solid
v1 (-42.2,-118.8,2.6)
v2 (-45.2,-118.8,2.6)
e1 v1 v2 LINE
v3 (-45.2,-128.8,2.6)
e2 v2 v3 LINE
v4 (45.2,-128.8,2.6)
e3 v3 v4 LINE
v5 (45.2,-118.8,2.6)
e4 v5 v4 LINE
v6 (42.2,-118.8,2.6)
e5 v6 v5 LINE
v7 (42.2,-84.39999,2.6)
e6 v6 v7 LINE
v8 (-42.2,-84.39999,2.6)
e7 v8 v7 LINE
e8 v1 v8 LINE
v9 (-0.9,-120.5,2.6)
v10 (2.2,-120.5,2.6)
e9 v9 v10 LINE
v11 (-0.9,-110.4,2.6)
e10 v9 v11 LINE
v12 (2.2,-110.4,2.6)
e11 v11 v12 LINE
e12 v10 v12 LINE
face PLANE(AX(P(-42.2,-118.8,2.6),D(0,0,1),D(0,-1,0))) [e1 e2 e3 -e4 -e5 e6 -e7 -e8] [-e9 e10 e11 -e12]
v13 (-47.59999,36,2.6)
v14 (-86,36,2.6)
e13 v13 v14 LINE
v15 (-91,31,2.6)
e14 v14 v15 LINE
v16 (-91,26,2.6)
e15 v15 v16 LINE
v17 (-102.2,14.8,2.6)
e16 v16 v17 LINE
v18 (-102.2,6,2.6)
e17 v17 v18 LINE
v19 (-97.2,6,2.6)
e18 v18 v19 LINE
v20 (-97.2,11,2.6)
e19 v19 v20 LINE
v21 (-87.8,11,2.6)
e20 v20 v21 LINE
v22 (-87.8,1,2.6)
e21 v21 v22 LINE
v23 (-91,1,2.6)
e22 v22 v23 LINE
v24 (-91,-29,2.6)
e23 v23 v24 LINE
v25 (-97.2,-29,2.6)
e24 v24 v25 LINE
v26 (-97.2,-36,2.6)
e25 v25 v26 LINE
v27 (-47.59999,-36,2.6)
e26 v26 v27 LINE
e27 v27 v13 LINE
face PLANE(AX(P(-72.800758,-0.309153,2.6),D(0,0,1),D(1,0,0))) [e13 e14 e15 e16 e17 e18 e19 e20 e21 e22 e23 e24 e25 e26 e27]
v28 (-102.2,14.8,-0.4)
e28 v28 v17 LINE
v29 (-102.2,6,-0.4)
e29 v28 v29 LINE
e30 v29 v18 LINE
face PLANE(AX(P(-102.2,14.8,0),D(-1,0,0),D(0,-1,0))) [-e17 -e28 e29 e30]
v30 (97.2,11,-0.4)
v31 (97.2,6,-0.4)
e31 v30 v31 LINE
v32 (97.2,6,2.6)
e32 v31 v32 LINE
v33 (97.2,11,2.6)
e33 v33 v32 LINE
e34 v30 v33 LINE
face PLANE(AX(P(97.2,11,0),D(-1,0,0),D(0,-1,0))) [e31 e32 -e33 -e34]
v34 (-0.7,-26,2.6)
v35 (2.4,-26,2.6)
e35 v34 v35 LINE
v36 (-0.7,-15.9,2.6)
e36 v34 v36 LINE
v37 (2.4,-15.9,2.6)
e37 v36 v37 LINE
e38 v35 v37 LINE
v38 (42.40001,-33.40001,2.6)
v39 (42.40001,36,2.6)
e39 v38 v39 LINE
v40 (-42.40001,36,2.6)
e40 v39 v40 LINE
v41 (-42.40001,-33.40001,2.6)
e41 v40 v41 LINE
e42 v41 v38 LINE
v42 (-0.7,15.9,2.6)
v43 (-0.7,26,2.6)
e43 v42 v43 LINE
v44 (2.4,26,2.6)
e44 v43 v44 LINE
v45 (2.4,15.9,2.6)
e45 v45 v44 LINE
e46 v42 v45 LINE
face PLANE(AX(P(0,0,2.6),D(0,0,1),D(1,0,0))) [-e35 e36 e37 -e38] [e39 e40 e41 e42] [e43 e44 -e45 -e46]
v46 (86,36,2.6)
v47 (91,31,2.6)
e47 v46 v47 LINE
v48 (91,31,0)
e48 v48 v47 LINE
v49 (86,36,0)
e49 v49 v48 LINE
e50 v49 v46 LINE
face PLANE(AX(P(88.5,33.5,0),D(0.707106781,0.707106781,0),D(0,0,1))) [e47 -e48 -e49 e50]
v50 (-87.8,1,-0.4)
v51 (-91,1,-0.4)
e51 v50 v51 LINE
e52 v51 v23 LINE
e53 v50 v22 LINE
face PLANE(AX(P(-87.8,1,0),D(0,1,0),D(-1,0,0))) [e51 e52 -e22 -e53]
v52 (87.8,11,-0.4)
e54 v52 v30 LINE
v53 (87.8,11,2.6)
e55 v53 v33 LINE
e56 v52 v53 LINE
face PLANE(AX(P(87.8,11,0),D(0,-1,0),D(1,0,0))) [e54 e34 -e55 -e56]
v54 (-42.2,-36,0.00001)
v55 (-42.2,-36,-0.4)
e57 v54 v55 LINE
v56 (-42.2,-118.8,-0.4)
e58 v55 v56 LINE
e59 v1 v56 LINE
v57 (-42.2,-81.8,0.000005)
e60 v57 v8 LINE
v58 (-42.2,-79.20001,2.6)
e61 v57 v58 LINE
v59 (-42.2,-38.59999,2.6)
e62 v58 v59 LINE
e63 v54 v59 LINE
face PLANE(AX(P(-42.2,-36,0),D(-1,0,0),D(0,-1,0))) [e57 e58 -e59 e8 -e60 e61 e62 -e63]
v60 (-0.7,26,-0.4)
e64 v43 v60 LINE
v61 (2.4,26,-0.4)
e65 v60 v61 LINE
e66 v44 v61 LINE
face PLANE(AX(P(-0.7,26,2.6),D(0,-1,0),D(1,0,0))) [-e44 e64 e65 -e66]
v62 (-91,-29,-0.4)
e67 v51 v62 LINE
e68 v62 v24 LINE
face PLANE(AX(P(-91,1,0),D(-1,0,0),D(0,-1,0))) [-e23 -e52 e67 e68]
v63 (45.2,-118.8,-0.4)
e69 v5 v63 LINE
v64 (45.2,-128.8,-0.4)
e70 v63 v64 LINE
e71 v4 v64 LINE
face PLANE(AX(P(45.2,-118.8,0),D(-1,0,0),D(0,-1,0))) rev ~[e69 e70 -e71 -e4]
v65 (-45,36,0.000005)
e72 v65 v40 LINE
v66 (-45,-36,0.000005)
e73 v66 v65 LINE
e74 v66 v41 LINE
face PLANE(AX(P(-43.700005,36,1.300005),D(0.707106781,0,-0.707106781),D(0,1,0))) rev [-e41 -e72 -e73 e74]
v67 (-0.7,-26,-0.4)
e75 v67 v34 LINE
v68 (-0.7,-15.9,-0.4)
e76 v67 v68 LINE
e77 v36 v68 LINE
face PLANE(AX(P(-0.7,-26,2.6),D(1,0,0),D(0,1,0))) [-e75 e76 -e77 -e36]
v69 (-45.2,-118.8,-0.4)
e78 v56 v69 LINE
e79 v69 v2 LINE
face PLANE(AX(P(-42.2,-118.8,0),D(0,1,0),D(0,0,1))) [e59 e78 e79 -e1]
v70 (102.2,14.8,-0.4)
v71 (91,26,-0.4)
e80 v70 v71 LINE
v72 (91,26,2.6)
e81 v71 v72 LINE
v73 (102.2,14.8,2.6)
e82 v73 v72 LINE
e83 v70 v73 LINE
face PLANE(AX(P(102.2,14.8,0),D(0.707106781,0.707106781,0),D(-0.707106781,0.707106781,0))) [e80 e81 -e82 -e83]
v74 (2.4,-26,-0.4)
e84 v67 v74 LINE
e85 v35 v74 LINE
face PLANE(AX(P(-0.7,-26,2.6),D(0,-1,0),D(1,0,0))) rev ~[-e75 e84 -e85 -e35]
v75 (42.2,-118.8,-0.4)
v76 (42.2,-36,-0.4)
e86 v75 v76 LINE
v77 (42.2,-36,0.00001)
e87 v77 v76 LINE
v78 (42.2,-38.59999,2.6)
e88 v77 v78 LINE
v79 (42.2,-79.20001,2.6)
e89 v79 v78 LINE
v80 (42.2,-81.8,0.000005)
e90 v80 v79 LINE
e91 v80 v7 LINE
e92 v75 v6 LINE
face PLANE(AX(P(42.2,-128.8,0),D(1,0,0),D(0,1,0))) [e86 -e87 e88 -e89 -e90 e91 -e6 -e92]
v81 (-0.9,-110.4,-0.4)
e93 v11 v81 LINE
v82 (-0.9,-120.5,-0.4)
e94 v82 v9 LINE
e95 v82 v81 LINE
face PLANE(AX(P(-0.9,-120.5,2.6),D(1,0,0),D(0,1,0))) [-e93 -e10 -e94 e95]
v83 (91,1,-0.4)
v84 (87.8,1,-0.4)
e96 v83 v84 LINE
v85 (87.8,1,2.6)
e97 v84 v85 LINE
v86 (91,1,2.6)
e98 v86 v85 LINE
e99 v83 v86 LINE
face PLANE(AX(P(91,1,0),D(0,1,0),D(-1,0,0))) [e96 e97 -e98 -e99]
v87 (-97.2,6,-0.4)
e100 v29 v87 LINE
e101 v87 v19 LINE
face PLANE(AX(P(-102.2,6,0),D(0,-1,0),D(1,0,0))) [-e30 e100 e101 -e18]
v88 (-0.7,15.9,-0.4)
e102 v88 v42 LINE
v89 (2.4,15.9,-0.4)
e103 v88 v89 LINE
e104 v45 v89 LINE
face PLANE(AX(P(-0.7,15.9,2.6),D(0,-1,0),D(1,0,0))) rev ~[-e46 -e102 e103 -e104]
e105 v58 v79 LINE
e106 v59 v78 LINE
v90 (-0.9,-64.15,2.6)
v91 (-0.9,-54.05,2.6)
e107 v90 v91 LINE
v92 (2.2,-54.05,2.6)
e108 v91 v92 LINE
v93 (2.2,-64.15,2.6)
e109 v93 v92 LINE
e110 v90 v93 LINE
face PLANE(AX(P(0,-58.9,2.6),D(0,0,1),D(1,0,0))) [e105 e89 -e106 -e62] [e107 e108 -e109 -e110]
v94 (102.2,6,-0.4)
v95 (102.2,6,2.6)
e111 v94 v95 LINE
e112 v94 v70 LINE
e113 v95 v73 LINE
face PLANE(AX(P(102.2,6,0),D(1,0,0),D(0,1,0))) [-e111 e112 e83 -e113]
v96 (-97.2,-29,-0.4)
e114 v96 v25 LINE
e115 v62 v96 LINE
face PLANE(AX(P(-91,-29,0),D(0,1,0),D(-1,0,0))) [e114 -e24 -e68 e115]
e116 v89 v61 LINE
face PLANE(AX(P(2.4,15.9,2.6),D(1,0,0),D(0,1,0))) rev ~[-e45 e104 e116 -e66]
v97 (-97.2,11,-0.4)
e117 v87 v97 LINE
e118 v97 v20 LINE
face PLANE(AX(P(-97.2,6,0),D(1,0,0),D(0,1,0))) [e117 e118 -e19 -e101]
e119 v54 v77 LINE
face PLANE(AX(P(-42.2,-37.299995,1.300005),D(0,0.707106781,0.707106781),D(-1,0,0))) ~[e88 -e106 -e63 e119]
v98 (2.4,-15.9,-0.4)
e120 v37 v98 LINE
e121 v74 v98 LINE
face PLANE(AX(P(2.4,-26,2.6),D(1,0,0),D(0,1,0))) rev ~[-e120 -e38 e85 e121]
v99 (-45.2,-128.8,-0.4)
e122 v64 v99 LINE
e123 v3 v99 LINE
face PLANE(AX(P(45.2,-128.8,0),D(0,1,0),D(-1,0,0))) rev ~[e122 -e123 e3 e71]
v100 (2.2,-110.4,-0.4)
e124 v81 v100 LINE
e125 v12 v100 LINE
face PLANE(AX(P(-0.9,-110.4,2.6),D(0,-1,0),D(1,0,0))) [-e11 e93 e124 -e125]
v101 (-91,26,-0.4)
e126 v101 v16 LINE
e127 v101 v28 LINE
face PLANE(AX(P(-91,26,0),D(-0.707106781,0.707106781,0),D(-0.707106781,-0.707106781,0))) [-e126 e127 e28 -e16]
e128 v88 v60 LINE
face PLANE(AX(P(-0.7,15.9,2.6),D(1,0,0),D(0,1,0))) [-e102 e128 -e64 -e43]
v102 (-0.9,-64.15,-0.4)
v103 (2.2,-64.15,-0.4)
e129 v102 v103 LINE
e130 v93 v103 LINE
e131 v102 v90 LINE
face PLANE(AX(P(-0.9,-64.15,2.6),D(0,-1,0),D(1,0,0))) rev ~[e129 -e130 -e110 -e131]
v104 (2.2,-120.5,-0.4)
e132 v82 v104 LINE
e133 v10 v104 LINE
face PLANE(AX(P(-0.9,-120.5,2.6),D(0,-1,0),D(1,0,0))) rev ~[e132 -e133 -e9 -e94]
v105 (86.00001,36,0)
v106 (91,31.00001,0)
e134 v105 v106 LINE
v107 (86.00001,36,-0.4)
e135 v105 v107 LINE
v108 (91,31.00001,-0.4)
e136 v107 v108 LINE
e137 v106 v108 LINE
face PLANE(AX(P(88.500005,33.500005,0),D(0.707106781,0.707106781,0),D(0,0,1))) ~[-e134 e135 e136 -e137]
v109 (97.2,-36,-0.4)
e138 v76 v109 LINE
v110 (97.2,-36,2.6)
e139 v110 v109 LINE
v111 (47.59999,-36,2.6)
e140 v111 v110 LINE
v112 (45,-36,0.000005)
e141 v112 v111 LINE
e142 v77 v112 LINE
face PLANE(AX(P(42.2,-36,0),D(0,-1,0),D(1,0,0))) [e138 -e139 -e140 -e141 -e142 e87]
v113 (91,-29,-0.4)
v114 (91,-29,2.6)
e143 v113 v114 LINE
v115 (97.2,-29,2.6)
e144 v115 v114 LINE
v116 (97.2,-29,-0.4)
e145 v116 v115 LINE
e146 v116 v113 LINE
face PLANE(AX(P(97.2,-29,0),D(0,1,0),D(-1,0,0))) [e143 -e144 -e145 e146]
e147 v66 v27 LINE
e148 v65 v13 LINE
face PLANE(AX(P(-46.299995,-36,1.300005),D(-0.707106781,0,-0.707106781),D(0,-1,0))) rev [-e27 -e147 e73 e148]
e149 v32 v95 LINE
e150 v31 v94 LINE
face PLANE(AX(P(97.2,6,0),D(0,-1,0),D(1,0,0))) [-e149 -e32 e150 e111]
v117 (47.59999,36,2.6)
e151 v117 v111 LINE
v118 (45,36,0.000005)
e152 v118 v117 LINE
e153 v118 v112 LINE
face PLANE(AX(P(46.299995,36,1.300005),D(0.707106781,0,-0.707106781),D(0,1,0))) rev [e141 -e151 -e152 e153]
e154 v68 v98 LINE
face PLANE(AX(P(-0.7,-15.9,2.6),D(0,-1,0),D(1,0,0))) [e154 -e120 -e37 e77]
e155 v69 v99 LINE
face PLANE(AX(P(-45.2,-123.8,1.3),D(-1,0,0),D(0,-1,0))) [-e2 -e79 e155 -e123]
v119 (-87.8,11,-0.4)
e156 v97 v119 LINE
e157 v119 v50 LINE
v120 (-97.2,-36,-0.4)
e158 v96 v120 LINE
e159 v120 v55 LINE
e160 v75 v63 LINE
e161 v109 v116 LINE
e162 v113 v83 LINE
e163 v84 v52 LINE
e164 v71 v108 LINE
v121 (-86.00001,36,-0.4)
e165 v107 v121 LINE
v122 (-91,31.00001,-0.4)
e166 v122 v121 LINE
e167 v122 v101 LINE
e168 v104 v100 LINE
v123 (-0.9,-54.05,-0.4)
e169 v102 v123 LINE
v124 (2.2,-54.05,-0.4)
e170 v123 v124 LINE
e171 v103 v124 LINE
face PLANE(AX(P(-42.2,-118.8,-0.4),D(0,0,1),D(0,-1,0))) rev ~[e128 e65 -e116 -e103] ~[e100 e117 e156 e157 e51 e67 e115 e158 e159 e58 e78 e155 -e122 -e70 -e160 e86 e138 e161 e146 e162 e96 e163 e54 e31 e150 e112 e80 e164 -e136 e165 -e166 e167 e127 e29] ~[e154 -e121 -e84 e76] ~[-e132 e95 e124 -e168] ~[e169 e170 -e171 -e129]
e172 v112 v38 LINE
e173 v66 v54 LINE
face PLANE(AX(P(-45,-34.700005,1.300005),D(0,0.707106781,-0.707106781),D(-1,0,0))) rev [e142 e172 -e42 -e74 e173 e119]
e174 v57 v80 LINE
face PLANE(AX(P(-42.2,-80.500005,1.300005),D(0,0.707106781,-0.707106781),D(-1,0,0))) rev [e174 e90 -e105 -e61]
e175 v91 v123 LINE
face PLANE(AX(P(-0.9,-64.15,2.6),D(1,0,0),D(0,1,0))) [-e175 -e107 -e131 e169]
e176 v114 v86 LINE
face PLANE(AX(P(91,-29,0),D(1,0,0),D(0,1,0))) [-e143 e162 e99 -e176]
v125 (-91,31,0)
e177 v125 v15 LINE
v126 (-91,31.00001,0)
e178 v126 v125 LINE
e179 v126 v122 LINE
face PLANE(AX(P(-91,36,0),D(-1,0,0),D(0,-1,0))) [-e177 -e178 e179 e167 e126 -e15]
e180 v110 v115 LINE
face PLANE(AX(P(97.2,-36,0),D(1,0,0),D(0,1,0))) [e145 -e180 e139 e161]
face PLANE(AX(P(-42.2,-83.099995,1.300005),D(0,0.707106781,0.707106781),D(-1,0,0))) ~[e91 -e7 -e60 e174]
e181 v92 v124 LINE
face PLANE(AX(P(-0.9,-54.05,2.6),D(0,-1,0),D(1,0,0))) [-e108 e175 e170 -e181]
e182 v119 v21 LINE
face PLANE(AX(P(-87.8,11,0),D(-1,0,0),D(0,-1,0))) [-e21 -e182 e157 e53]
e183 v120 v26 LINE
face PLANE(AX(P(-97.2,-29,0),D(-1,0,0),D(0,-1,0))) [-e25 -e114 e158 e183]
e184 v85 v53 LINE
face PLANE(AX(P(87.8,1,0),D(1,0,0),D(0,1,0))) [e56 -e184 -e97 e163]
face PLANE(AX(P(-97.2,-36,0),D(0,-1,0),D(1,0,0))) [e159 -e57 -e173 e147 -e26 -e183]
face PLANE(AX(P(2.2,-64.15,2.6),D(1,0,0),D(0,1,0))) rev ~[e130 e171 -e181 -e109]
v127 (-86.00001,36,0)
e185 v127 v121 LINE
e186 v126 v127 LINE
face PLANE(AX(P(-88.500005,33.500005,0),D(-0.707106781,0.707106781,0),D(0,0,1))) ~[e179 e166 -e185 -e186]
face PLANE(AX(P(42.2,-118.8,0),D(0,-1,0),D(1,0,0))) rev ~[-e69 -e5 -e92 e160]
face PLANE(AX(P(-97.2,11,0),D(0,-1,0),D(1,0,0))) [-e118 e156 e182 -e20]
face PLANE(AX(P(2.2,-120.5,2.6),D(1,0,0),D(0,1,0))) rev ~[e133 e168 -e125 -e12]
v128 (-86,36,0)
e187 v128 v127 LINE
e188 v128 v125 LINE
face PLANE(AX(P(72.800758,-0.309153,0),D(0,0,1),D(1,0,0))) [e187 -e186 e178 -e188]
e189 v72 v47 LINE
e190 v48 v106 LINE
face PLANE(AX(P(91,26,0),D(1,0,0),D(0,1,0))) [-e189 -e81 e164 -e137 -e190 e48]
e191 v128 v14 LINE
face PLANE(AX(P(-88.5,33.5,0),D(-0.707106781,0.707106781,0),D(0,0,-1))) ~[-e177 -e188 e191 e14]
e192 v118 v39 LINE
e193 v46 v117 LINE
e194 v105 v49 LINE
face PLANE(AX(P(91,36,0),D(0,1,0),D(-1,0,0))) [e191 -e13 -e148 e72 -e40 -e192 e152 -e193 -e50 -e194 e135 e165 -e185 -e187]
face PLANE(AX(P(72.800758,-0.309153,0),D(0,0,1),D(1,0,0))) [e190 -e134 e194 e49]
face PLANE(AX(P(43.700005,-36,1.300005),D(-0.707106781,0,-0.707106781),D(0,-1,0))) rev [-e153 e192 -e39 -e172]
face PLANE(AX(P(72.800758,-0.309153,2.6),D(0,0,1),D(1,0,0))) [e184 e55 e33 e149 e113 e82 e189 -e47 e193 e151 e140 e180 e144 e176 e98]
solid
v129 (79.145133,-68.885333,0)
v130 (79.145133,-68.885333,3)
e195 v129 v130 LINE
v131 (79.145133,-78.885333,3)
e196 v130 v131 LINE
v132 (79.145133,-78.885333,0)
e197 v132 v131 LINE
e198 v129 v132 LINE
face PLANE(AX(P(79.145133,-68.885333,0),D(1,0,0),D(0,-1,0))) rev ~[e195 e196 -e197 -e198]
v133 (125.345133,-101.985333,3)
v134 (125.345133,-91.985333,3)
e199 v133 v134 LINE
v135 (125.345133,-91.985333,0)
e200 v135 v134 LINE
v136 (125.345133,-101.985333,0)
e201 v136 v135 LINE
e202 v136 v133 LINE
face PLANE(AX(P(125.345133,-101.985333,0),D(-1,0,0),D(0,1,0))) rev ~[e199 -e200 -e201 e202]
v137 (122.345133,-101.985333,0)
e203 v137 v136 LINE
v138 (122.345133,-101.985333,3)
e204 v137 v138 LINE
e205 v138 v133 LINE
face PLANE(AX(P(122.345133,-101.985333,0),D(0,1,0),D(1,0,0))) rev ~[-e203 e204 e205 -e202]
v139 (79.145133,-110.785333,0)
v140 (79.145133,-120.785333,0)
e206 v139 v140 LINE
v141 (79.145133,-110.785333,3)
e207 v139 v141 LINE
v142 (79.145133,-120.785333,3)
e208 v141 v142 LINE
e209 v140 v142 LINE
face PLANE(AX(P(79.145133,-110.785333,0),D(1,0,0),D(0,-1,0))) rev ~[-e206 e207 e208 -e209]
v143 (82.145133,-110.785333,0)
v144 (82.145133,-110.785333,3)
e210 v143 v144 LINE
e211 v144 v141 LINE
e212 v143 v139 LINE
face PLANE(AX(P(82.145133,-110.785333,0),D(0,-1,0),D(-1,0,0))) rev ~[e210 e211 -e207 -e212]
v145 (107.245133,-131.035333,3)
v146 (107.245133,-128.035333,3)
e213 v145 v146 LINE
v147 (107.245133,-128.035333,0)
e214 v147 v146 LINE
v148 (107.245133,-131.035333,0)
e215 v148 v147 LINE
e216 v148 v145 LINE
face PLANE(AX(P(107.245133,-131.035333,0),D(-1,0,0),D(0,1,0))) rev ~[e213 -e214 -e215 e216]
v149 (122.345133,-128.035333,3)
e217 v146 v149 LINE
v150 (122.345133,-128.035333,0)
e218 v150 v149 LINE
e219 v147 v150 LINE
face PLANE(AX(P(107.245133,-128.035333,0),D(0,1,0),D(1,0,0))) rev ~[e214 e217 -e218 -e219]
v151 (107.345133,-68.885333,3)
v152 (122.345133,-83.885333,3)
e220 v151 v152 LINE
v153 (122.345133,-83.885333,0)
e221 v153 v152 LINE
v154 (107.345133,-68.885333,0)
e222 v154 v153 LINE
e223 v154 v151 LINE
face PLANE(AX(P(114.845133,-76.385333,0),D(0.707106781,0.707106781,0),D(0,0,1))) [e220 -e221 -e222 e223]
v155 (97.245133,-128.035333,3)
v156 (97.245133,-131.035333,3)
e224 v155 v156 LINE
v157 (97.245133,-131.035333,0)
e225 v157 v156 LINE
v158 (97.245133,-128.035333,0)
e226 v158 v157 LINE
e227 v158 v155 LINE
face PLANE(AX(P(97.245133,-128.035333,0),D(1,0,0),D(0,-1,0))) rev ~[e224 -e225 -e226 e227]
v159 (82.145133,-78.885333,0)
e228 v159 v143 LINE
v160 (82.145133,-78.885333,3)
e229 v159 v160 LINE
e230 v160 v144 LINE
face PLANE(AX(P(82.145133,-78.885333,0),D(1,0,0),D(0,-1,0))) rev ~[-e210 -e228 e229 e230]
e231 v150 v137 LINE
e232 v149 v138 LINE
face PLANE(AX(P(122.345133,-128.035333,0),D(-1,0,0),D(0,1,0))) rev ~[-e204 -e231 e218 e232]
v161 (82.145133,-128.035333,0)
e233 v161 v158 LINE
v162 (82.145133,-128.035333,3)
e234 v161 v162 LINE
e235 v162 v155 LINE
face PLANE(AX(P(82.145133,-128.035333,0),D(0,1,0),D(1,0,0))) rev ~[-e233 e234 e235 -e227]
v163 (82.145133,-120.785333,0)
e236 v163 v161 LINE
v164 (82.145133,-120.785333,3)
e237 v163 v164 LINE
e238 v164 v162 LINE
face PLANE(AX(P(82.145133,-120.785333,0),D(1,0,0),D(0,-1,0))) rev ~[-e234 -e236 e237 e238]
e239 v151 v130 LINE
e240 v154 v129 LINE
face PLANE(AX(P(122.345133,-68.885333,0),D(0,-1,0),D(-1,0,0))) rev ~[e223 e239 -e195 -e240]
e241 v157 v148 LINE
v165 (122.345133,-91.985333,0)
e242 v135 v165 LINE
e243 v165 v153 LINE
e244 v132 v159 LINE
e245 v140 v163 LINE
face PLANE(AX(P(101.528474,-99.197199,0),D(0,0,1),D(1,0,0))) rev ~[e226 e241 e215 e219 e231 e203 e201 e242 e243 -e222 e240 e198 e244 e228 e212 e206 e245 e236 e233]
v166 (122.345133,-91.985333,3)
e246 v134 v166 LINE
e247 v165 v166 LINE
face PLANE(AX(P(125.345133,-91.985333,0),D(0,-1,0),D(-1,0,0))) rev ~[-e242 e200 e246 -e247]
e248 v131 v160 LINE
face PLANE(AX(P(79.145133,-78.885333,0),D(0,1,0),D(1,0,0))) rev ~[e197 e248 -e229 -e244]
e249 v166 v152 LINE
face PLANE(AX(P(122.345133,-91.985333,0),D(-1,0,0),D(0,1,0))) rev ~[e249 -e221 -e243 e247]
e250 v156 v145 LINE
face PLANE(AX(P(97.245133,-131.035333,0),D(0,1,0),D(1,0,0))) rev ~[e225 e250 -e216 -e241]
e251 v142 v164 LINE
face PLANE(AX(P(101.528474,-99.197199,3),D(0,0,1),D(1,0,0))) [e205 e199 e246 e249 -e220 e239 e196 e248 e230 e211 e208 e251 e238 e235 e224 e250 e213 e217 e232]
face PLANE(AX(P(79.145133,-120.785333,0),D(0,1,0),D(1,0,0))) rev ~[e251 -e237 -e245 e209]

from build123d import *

# Parameters (mm, degrees)
F1_DEPTH   = 2.6
F2_SIZE    = 2.59999
F2_2_SIZE  = 2.59999
F3_DEPTH   = 2.6
F4_SIZE    = 2.59999
F5_W       = 3.1
F5_H       = 10.1
F6_DEPTH   = 4
F0_W       = 84.4
F0_H       = 45.8
F7_DEPTH   = 2.6
F8_SIZE    = 2.59999
F0_H_2     = 47
F9_DEPTH   = 2.6
F10_SIZE   = 2.59999
F11_W      = 10
F11_H      = 2.6
F12_DEPTH  = 3
F15_W      = 3.1
F15_H      = 10.1
F14_W      = 3.1
F14_H      = 10.1
F16_DEPTH  = 4
F18_DEPTH  = 3
F19_SIZE   = 5
F19_2_SIZE = 5
F20_SIZE   = 15
F21_DEPTH  = 0.4
F22_DEPTH  = 0.4
F23_DEPTH  = 25
F24_SIZE   = 4.99999


# Not quite as in the source:
# - a fillet or chamfer is up to 0.001 mm smaller than in the source, because OpenCascade refuses the exact size


with BuildPart() as f1:
    # F0 (on Top) → F1 (new body)
    with BuildSketch(Plane.XY):
        Polygon((-45, -36), (-45, 36), (-91, 36), (-91, 26), (-102.2, 14.8), (-102.2, 6), (-97.2, 6), (-97.2, 11), (-91, 11), (-87.8, 11), (-87.8, 1), (-91, 1), (-91, -29), (-97.2, -29), (-97.2, -36), (-91, -36), align=None)
    extrude(amount=F1_DEPTH)

    # F2#2 (size 2.6 in the source; OpenCascade refuses exactly that, so slightly less here)
    f2_2_edges = [f1.edges().sort_by_distance(p)[0] for p in [
        (-45, 0, 2.6),
    ]]
    chamfer(f2_2_edges, length=F2_2_SIZE)

    # F19#2
    f19_2_edges = [f1.edges().sort_by_distance(p)[0] for p in [
        (-91, 36, 1.3),
    ]]
    chamfer(f19_2_edges, length=F19_2_SIZE)



with BuildPart() as f1b:
    # F0 (on Top) → F1, piece 2 (new body)
    with BuildSketch(Plane.XY):
        Polygon((45, 36), (45, -36), (91, -36), (97.2, -36), (97.2, -29), (91, -29), (91, 1), (87.8, 1), (87.8, 11), (91, 11), (97.2, 11), (97.2, 6), (102.2, 6), (102.2, 14.8), (91, 26), (91, 36), align=None)
    extrude(amount=F1_DEPTH)

    # F2 (size 2.6 in the source; OpenCascade refuses exactly that, so slightly less here)
    f2_edges = [f1b.edges().sort_by_distance(p)[0] for p in [
        (45, 0, 2.6),
    ]]
    chamfer(f2_edges, length=F2_SIZE)

    # F19
    f19_edges = [f1b.edges().sort_by_distance(p)[0] for p in [
        (91, 36, 1.3),
    ]]
    chamfer(f19_edges, length=F19_SIZE)


with BuildPart() as f3:
    # F0 (on Top) → F3 (new body)
    with BuildSketch(Plane.XY):
        Polygon((42.2, -36), (45, -36), (45, 36), (-45, 36), (-45, -36), (-42.2, -36), align=None)
    extrude(amount=F3_DEPTH)

    # F4 (size 2.6 in the source; OpenCascade refuses exactly that, so slightly less here)
    f4_edges = [f3.edges().sort_by_distance(p)[0] for p in [
        (45, 0, 2.6),
        (-45, 0, 2.6),
        (0, -36, 2.6),
    ]]
    chamfer(f4_edges, length=F4_SIZE)

    # F5 (on face) → F6 (cut)
    with BuildSketch(Plane.XY.offset(2.6)):
        with Locations((0.85, 20.95)):
            Rectangle(F5_W, F5_H)
        with Locations((0.85, -20.95)):
            Rectangle(F5_W, F5_H)
    extrude(amount=-F6_DEPTH, mode=Mode.SUBTRACT)


with BuildPart() as f7:
    # F0 (on Top) → F7 (new body)
    with BuildSketch(Plane.XY):
        with Locations((0, -58.9)):
            Rectangle(F0_W, F0_H)
    extrude(amount=F7_DEPTH)

    # F8 (size 2.6 in the source; OpenCascade refuses exactly that, so slightly less here)
    f8_edges = [f7.edges().sort_by_distance(p)[0] for p in [
        (0, -36, 2.6),
        (0, -81.8, 2.6),
    ]]
    chamfer(f8_edges, length=F8_SIZE)


with BuildPart() as f9:
    # F0 (on Top) → F9 (new body)
    with BuildSketch(Plane.XY):
        with Locations((0, -105.3)):
            Rectangle(F0_W, F0_H_2)
    extrude(amount=F9_DEPTH)

    # F10 (size 2.6 in the source; OpenCascade refuses exactly that, so slightly less here)
    f10_edges = [f9.edges().sort_by_distance(p)[0] for p in [
        (0, -81.8, 2.6),
    ]]
    chamfer(f10_edges, length=F10_SIZE)

    # F13: F12 across plane


with BuildPart() as f12:
    # F11 (on face) → F12 (new body)
    with BuildSketch(Plane(origin=(-42.2, 0, 0), x_dir=(0, -1, 0), z_dir=(-1, 0, 0))):
        with Locations((123.8, 1.3)):
            Rectangle(F11_W, F11_H)
    extrude(amount=F12_DEPTH)


with BuildPart() as f9_1:
    add(f9.part)
    add(f12.part.mirror(Plane.YZ))


with BuildPart() as f16_tool:
    # F15 (on face) + F14 (on face) → F16 (new body)
    with BuildSketch(Plane.XY.offset(2.6)):
        with Locations((0.65, -115.45)):
            Rectangle(F15_W, F15_H)
    with BuildSketch(Plane.XY.offset(2.6)):
        with Locations((0.65, -59.1)):
            Rectangle(F14_W, F14_H)
    extrude(amount=-F16_DEPTH)


with BuildPart() as f7_1:
    add(f7.part)

    # F16: cut by f16_tool
    add(f16_tool.part, mode=Mode.SUBTRACT)


with BuildPart() as f9_2:
    add(f9_1.part)

    # F16: cut by f16_tool
    add(f16_tool.part, mode=Mode.SUBTRACT)


with BuildPart() as f18:
    # F17 (on Top) → F18 (new body)
    with BuildSketch(Plane.XY):
        Polygon((122.3451334953, -68.8853332162), (82.1451334953, -68.8853332162), (79.1451334953, -68.8853332162), (79.1451334953, -78.8853332162), (82.1451334953, -78.8853332162), (82.1451334953, -110.7853332162), (79.1451334953, -110.7853332162), (79.1451334953, -120.7853332162), (82.1451334953, -120.7853332162), (82.1451334953, -128.0353332162), (97.2451334953, -128.0353332162), (97.2451334953, -131.0353332162), (102.2451334953, -131.0353332162), (107.2451334953, -131.0353332162), (107.2451334953, -128.0353332162), (122.3451334953, -128.0353332162), (122.3451334953, -101.9853332162), (125.3451334953, -101.9853332162), (125.3451334953, -91.9853332162), (122.3451334953, -91.9853332162), align=None)
    extrude(amount=F18_DEPTH)

    # F20
    f20_edges = [f18.edges().sort_by_distance(p)[0] for p in [
        (122.345133, -68.885333, 1.5),
    ]]
    chamfer(f20_edges, length=F20_SIZE)


with BuildPart() as f1_1:
    add(f1.part)

    add(f1b.part)  # F21 merges F1b

    add(f3.part)  # F21 merges F3

    add(f7_1.part)  # F21 merges F7

    add(f9_2.part)  # F21 merges F9

    add(f12.part)  # F21 merges F12
    # F0 (on Top) → F21 (join)
    with BuildSketch(Plane.XY):
        Polygon((45, 36), (45, -36), (91, -36), (97.2, -36), (97.2, -29), (91, -29), (91, 1), (87.8, 1), (87.8, 11), (91, 11), (97.2, 11), (97.2, 6), (102.2, 6), (102.2, 14.8), (91, 26), (91, 36), align=None)
        Polygon((-45, -36), (-45, 36), (-91, 36), (-91, 26), (-102.2, 14.8), (-102.2, 6), (-97.2, 6), (-97.2, 11), (-91, 11), (-87.8, 11), (-87.8, 1), (-91, 1), (-91, -29), (-97.2, -29), (-97.2, -36), (-91, -36), align=None)
        with Locations((0, -105.3)):
            Rectangle(F0_W, F0_H_2)
        with Locations((0, -58.9)):
            Rectangle(F0_W, F0_H)
        Polygon((42.2, -36), (45, -36), (45, 36), (-45, 36), (-45, -36), (-42.2, -36), align=None)
    extrude(amount=-F21_DEPTH)

    # F22 (add): faces of the model
    f22_faces = [f1_1.faces().sort_by_distance(p)[0] for p in [
        (43.7, -123.8, 0),
        (-43.7, -123.8, 0),
    ]]
    extrude(f22_faces, amount=F22_DEPTH)

    # F15 (on face) + F14 (on face) + F5 (on face) → F23 (cut)
    with BuildSketch(Plane.XY.offset(2.6)):
        with Locations((0.65, -115.45)):
            Rectangle(F15_W, F15_H)
    with BuildSketch(Plane.XY.offset(2.6)):
        with Locations((0.65, -59.1)):
            Rectangle(F14_W, F14_H)
    with BuildSketch(Plane.XY.offset(2.6)):
        with Locations((0.85, 20.95)):
            Rectangle(F5_W, F5_H)
        with Locations((0.85, -20.95)):
            Rectangle(F5_W, F5_H)
    extrude(amount=-F23_DEPTH, mode=Mode.SUBTRACT)

    # F24 (size 5 in the source; OpenCascade refuses exactly that, so slightly less here)
    f24_edges = [f1_1.edges().sort_by_distance(p)[0] for p in [
        (-91, 36, -0.2),
        (91, 36, -0.2),
    ]]
    chamfer(f24_edges, length=F24_SIZE)


solid = Compound([f18.part, f1_1.part])
